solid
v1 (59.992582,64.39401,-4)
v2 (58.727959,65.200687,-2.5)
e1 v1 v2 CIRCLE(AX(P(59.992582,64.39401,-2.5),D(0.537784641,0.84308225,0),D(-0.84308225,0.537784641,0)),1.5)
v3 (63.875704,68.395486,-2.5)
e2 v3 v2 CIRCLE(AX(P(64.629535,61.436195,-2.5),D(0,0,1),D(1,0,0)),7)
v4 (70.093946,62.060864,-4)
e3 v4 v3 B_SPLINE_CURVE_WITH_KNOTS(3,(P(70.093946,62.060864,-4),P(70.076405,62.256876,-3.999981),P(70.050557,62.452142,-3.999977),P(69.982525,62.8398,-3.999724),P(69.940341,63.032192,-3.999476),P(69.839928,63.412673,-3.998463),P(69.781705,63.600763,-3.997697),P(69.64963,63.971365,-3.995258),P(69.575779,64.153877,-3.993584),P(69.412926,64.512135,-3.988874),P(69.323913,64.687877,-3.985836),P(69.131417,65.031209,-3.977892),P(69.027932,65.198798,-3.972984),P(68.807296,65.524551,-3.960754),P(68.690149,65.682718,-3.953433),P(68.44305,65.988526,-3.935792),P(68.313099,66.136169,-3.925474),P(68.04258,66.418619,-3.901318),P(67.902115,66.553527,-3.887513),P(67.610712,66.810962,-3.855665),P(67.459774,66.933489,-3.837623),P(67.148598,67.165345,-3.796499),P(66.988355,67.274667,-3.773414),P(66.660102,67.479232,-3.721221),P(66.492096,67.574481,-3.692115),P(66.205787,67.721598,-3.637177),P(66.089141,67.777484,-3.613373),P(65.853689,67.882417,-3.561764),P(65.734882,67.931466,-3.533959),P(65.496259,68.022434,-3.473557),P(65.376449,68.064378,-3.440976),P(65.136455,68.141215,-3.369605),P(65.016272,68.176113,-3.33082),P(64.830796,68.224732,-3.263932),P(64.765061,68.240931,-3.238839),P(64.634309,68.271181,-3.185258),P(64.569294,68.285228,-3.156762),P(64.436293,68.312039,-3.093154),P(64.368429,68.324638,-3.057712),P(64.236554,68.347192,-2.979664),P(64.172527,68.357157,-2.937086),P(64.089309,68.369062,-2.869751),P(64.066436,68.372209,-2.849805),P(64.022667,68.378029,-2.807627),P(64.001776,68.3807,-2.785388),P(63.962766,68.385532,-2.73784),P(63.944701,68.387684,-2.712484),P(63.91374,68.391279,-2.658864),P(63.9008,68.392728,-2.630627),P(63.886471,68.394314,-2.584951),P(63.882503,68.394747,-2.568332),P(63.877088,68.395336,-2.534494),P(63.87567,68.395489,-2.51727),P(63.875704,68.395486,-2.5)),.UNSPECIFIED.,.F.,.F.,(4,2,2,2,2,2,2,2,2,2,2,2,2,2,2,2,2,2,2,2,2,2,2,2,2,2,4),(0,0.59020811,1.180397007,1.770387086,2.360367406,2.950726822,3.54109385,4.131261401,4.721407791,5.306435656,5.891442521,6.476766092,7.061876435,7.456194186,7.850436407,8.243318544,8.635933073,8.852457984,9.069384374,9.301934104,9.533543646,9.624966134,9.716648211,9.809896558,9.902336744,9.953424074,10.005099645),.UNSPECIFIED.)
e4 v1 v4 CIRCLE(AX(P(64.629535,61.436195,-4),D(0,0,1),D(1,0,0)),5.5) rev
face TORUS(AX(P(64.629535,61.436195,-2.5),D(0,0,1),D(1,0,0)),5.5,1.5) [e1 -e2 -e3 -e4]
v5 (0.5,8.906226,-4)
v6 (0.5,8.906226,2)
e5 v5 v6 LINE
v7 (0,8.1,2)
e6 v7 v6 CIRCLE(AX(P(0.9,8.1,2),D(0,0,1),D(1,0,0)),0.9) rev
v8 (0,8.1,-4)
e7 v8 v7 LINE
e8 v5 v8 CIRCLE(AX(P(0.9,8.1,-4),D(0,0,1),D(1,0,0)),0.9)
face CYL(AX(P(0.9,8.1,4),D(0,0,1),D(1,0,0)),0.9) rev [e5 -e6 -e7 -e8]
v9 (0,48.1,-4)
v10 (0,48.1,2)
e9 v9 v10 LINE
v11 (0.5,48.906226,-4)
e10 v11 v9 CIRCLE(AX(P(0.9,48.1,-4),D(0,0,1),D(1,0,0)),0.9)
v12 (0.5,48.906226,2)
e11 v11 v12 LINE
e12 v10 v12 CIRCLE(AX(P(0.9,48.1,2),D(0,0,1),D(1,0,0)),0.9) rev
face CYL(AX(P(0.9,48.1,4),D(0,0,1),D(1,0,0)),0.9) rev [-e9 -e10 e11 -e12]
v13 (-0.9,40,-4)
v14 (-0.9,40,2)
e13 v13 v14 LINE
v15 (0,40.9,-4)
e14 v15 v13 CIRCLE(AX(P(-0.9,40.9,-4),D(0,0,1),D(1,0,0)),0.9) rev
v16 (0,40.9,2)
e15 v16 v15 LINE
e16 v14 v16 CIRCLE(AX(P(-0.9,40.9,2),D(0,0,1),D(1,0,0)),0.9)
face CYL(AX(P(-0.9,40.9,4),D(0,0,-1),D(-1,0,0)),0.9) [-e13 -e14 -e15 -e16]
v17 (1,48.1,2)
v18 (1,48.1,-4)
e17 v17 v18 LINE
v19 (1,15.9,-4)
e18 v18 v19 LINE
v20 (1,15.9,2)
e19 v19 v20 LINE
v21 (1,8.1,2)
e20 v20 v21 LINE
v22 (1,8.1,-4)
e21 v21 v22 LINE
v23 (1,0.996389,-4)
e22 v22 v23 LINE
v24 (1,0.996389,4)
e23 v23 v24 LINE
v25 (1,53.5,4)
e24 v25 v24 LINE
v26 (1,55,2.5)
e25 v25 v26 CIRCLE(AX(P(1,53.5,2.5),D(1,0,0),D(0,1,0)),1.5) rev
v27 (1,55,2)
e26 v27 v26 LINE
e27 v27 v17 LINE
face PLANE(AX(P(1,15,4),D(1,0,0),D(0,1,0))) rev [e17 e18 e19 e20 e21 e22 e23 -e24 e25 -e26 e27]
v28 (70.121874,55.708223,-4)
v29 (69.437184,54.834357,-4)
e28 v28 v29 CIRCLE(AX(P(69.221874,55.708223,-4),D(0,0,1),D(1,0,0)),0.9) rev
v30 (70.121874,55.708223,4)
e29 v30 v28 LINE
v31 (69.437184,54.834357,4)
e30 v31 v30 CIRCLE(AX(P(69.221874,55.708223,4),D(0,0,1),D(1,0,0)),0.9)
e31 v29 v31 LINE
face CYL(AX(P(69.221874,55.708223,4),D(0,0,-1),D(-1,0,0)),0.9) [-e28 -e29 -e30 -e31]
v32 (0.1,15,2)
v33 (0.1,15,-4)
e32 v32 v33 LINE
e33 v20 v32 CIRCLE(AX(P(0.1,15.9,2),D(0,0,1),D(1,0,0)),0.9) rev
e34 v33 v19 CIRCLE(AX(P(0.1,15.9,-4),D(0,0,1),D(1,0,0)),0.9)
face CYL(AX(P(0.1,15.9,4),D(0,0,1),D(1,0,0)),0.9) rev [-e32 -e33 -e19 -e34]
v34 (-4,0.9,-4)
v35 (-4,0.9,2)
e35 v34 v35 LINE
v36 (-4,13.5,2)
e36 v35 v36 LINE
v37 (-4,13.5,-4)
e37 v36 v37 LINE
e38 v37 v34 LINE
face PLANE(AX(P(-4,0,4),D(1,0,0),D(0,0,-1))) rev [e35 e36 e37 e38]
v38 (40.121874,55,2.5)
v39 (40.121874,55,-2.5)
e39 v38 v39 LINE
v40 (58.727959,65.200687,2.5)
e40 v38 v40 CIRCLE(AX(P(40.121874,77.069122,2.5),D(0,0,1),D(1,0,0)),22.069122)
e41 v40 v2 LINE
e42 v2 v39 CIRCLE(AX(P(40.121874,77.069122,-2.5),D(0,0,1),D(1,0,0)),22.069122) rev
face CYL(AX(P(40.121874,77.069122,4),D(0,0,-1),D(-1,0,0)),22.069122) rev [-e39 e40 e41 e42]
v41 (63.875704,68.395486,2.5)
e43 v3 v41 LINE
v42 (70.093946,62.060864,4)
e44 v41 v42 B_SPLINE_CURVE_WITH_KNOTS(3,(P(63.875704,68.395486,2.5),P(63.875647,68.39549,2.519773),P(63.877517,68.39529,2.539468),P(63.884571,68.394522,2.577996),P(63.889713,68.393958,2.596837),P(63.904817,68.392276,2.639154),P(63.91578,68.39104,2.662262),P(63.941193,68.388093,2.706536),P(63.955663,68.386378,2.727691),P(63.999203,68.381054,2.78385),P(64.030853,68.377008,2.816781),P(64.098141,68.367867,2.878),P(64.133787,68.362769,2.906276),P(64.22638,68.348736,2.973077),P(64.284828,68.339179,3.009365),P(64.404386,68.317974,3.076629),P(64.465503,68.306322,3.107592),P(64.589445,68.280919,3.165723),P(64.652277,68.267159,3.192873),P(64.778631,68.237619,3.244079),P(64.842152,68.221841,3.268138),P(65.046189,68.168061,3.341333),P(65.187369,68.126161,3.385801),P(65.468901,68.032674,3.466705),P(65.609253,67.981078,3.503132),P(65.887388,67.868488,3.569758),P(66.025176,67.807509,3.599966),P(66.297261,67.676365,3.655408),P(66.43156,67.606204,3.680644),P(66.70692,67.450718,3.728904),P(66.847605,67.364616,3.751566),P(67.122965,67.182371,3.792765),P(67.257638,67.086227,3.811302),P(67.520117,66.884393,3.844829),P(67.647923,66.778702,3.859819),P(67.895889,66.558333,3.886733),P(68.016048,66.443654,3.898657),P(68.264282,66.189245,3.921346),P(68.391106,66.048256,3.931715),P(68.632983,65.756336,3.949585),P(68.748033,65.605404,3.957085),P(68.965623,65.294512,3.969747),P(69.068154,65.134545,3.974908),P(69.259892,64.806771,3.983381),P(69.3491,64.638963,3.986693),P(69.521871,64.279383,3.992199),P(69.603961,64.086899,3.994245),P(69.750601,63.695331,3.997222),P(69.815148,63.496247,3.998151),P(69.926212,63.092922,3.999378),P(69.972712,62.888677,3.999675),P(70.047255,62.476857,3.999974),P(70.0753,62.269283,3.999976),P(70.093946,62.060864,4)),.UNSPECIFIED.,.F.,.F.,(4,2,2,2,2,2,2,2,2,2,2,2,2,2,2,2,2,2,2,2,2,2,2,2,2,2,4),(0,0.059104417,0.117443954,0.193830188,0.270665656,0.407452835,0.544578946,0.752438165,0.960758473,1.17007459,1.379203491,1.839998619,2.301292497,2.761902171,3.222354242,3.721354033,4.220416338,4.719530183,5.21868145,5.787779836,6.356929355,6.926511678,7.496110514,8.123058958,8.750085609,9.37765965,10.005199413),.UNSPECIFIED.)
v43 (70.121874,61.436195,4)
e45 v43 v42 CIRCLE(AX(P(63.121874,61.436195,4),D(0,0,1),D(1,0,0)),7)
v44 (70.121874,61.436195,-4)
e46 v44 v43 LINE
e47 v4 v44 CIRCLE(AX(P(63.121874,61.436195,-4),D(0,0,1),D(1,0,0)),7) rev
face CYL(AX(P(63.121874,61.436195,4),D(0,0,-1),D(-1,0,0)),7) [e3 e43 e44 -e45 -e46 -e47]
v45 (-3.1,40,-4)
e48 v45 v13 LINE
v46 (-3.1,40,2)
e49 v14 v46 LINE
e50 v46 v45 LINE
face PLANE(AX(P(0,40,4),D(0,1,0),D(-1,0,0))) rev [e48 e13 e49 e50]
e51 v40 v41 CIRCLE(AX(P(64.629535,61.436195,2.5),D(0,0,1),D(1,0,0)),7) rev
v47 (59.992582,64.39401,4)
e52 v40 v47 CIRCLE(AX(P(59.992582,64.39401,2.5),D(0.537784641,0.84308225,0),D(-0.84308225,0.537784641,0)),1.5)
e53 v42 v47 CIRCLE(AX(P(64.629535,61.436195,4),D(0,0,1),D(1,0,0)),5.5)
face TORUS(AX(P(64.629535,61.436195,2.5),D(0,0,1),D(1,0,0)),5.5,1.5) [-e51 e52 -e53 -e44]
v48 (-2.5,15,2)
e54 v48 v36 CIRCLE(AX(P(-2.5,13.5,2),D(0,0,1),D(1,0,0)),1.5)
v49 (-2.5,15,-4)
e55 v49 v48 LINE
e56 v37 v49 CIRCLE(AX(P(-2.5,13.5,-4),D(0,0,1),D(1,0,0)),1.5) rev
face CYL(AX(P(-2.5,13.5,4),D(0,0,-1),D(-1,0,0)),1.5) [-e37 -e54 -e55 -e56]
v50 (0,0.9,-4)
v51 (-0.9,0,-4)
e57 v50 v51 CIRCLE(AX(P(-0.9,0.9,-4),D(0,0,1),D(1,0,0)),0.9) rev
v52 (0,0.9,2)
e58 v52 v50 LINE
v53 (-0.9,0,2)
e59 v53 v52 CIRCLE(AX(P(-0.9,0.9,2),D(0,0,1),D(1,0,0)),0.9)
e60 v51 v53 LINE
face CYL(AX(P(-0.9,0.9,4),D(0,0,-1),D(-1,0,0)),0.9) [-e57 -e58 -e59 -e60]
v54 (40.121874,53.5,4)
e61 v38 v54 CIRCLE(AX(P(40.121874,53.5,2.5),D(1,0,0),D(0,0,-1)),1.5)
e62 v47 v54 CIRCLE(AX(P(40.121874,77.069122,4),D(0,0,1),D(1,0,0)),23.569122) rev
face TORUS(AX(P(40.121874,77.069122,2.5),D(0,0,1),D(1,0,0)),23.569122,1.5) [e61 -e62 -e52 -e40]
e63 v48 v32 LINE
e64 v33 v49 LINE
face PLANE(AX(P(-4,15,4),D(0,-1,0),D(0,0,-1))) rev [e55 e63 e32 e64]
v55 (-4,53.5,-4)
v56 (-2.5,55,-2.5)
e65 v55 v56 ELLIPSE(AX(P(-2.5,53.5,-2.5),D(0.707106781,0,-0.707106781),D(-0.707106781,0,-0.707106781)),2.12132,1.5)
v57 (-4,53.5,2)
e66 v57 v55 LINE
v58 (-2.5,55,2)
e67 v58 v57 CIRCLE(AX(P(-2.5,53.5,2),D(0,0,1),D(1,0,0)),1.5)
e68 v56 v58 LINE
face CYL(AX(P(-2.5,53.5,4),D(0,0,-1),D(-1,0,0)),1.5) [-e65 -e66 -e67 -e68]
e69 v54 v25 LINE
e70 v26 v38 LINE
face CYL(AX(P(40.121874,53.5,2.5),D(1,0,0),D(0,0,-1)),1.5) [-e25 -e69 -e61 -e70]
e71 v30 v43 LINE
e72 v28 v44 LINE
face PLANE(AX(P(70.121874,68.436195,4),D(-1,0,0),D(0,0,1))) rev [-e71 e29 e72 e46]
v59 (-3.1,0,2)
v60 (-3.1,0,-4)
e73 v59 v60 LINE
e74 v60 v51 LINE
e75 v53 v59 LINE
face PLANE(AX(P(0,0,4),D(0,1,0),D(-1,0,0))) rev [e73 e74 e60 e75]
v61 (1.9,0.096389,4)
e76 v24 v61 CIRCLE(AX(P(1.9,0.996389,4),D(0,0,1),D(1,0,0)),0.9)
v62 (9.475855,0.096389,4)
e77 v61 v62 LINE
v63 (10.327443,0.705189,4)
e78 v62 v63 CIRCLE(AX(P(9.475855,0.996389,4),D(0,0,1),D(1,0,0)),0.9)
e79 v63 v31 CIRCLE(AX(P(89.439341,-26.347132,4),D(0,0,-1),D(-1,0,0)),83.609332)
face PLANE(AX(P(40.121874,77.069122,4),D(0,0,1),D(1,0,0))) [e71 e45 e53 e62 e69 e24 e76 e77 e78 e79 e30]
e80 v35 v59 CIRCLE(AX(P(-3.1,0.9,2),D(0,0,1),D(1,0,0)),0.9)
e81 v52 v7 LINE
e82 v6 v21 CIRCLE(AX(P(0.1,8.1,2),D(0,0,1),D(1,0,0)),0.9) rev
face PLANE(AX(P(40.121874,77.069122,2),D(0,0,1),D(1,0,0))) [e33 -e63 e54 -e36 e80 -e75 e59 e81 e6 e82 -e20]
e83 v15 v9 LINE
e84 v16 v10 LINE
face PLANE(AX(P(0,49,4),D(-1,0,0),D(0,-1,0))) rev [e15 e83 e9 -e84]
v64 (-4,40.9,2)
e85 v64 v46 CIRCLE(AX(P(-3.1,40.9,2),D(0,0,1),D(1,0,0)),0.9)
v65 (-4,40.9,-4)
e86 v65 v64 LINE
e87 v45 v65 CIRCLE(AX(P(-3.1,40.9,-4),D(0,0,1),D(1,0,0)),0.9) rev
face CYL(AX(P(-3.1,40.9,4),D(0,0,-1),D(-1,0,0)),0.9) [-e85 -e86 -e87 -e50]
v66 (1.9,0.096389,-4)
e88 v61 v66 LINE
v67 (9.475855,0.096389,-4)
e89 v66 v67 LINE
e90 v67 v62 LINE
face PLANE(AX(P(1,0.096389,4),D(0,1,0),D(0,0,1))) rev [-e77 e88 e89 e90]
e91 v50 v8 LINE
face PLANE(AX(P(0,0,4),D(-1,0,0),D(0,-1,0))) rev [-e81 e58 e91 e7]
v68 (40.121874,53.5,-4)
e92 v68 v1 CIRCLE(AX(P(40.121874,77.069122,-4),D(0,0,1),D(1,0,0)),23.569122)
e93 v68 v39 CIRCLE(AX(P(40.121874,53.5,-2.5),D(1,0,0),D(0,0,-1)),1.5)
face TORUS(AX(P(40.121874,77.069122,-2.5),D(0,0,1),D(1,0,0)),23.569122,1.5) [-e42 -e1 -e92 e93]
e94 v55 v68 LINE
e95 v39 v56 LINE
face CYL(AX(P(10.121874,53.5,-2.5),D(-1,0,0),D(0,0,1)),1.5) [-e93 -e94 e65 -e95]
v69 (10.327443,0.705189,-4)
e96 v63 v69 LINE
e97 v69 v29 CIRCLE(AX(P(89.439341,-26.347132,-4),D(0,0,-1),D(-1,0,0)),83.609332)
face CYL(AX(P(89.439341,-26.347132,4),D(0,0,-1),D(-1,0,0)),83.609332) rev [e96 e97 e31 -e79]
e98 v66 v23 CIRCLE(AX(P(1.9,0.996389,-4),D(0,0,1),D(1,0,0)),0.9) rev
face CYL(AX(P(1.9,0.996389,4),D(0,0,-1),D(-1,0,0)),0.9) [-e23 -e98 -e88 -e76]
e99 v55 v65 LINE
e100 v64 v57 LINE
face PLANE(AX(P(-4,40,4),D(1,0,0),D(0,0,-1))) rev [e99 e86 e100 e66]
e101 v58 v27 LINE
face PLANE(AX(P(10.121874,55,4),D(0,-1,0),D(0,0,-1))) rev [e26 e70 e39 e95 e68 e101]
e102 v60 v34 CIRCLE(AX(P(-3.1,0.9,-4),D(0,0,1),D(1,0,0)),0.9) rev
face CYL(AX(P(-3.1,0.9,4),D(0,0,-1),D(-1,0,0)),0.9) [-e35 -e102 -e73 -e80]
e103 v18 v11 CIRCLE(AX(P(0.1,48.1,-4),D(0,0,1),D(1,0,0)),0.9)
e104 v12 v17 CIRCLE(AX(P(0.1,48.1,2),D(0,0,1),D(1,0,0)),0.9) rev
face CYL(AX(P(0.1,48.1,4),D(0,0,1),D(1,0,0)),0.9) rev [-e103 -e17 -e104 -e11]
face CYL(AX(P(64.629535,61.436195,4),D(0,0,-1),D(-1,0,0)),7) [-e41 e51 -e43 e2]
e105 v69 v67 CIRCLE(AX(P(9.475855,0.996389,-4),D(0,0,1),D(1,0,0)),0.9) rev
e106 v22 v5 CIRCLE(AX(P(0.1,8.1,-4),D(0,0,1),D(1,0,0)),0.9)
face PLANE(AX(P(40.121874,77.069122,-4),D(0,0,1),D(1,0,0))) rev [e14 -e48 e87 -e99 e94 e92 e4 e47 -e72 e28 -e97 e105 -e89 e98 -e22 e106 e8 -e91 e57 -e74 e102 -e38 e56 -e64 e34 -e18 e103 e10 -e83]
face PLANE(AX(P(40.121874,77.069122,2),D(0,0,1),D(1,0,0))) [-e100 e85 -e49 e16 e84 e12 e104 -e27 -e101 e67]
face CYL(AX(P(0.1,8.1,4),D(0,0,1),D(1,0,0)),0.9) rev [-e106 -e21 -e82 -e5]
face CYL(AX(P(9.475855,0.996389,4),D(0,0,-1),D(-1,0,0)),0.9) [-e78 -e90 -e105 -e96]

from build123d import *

# Parameters (mm, degrees)
BOSS_EXTRU_1_DEPTH      = 4
ENL_V_MAT_EXTRU_1_DEPTH = 2
CONG_4_R                = 7
CONG_3_R                = 0.9
CONG_5_R                = 1.5


with BuildPart() as part:
    # Esquisse1 → Boss.-Extru.1 (new, symmetric)
    with BuildSketch(Plane.XY):
        with BuildLine():
            Line((0, 0), (0, 9))
            Line((0, 9), (1, 9))
            Line((1, 9), (1, 0.09638948))
            Line((1, 0.09638948), (10.121873618, 0.09638948))
            ThreePointArc((10.121873618, 0.09638948), (32.996323667, 35.335168912), (70.121873618, 55))
            Line((70.121873618, 55), (70.121873618, 68.436194763))
            Line((70.121873618, 68.436194763), (60.432430442, 68.436194763))
            ThreePointArc((60.432430442, 68.436194763), (52.298183077, 58.663045958), (40.121873618, 55))
            Line((40.121873618, 55), (19.293191489, 55))
            Line((19.293191489, 55), (10.121873618, 55))
            Line((10.121873618, 55), (-4, 55))
            Line((-4, 55), (-4, 40))
            Line((-4, 40), (0, 40))
            Line((0, 40), (0, 49))
            Line((0, 49), (1, 49))
            Line((1, 49), (1, 15))
            Line((1, 15), (-4, 15))
            Line((-4, 15), (-4, 0))
            Line((-4, 0), (0, 0))
        make_face()
    extrude(amount=BOSS_EXTRU_1_DEPTH, both=True)

    # Esquisse4 → Enlèv. mat.-Extru.1 (cut)
    with BuildSketch(Plane.XY.offset(4)):
        Polygon((0, 40), (-4, 40), (-4, 55), (1, 55), (1, 40), align=None)
        Polygon((0, 0), (-4, 0), (-4, 15), (1, 15), (1, 0), align=None)
    extrude(amount=-ENL_V_MAT_EXTRU_1_DEPTH, mode=Mode.SUBTRACT)

    # Congé4
    # the kernel refuses this fillet: 7 mm, written as the material it takes off along each edge
    with BuildSketch(Plane(origin=(70.121873618, 68.436194763, -21.5), x_dir=(-1, 0, 0), z_dir=(0, 0, 1))) as cong_4_piece_1:
        with BuildLine():
            CenterArc((CONG_4_R, CONG_4_R), CONG_4_R, 180, 90)
            Line((0, CONG_4_R), (0, 0))
            Line((0, 0), (CONG_4_R, 0))
        make_face()
    extrude(amount=43, mode=Mode.SUBTRACT)
    with BuildSketch(Plane(origin=(60.432430442, 68.436194763, -14.492760312), x_dir=(-0.46608321311989886, -0.8847408877450115, 0), z_dir=(0, 0, 1))) as cong_4_piece_2:
        with BuildLine():
            CenterArc((4.236986438, 6.975932121), CONG_4_R, 207.780348291, 57.467043301)
            Line((-1.956199776, 3.713349629), (0, 0))
            ThreePointArc((0, 0), (1.828505702, 0.075879566), (3.657011403, 0))
        make_face()
    extrude(amount=28.985520624, mode=Mode.SUBTRACT)

    # Congé3
    # the kernel refuses this fillet: 0.9 mm, written as the material it adds along each edge
    with BuildSketch(Plane(origin=(1, 9, -4), x_dir=(-1, 0, 0), z_dir=(0, 0, 1)), Plane(origin=(0, 9, -4), x_dir=(0, -1, 0), z_dir=(0, 0, 1)), Plane(origin=(1, 15, -4), x_dir=(0, 1, 0), z_dir=(0, 0, 1))) as cong_3_piece_1:
        with BuildLine():
            CenterArc((CONG_3_R, CONG_3_R), CONG_3_R, 180, 90)
            Line((0, CONG_3_R), (0, 0))
            Line((0, 0), (CONG_3_R, 0))
        make_face()
    extrude(amount=6)
    with BuildSketch(Plane(origin=(1, 49, -4), x_dir=(0, -1, 0), z_dir=(0, 0, 1)), Plane(origin=(0, 49, -4), x_dir=(1, 0, 0), z_dir=(0, 0, 1))) as cong_3_piece_2:
        with BuildLine():
            CenterArc((CONG_3_R, -CONG_3_R), CONG_3_R, 90, 90)
            Line((0, -CONG_3_R), (0, 0))
            Line((0, 0), (CONG_3_R, 0))
        make_face()
    extrude(amount=6)
    # the kernel refuses this fillet: 0.9 mm, written as the material it takes off along each edge
    with BuildSketch(Plane(origin=(1, 0.09638948, -6.25), x_dir=(0, 1, 0), z_dir=(0, 0, 1))) as cong_3_2_piece_1:
        with BuildLine():
            CenterArc((CONG_3_R, -CONG_3_R), CONG_3_R, 90, 90)
            Line((0, -CONG_3_R), (0, 0))
            Line((0, 0), (CONG_3_R, 0))
        make_face()
    extrude(amount=12.5, mode=Mode.SUBTRACT)
    with BuildSketch(Plane(origin=(0, 0, 4.25), x_dir=(0, 1, 0), z_dir=(0, 0, -1)), Plane(origin=(-4, 0, 4.25), x_dir=(1, 0, 0), z_dir=(0, 0, -1))) as cong_3_2_piece_2:
        with BuildLine():
            CenterArc((CONG_3_R, -CONG_3_R), CONG_3_R, 90, 90)
            Line((0, -CONG_3_R), (0, 0))
            Line((0, 0), (CONG_3_R, 0))
        make_face()
    extrude(amount=10.5, mode=Mode.SUBTRACT)
    with BuildSketch(Plane(origin=(0, 40, -6.25), x_dir=(0, 1, 0), z_dir=(0, 0, 1)), Plane(origin=(-4, 40, -6.25), x_dir=(1, 0, 0), z_dir=(0, 0, 1))) as cong_3_2_piece_3:
        with BuildLine():
            CenterArc((CONG_3_R, CONG_3_R), CONG_3_R, 180, 90)
            Line((0, CONG_3_R), (0, 0))
            Line((0, 0), (CONG_3_R, 0))
        make_face()
    extrude(amount=10.5, mode=Mode.SUBTRACT)
    with BuildSketch(Plane(origin=(70.121873618, 55, -5.770556853), x_dir=(-0.9719612569458899, -0.2351410534044747, 0), z_dir=(0, 0, 1))) as cong_3_2_piece_4:
        with BuildLine():
            CenterArc((0.70823289, -0.899992014), CONG_3_R, 90.241370438, 76.15869203)
            Line((-0.166532241, -0.688365066), (0, 0))
            ThreePointArc((0, 0), (0.352220732, -0.000741903), (0.704441463, 0))
        make_face()
    extrude(amount=11.541113707, mode=Mode.SUBTRACT)
    with BuildSketch(Plane(origin=(10.121873618, 0.09638948, -5.615046517), x_dir=(-1, 0, 0), z_dir=(0, 0, 1))) as cong_3_2_piece_5:
        with BuildLine():
            CenterArc((0.646018607, -0.9), CONG_3_R, 90, 71.121872084)
            ThreePointArc((-0.205569441, -0.608799388), (-0.102199862, -0.304597179), (0, 0))
            Line((0, 0), (0.646018607, 0))
        make_face()
    extrude(amount=11.230093034, mode=Mode.SUBTRACT)

    # Congé5
    cong_5_edges = [part.edges().sort_by_distance(p)[0] for p in [
        (50.731308414, 57.717480203, -4),
        (60.938289065, 67.383858728, -4),
        (50.731308414, 57.717480203, 4),
        (60.938289065, 67.383858728, 4),
        (18.060936809, 55, -4),
        (20.560936809, 55, 4),
        (-4, 15, -1),
        (-4, 55, -1),
    ]]
    fillet(cong_5_edges, radius=CONG_5_R)


solid = part.part
